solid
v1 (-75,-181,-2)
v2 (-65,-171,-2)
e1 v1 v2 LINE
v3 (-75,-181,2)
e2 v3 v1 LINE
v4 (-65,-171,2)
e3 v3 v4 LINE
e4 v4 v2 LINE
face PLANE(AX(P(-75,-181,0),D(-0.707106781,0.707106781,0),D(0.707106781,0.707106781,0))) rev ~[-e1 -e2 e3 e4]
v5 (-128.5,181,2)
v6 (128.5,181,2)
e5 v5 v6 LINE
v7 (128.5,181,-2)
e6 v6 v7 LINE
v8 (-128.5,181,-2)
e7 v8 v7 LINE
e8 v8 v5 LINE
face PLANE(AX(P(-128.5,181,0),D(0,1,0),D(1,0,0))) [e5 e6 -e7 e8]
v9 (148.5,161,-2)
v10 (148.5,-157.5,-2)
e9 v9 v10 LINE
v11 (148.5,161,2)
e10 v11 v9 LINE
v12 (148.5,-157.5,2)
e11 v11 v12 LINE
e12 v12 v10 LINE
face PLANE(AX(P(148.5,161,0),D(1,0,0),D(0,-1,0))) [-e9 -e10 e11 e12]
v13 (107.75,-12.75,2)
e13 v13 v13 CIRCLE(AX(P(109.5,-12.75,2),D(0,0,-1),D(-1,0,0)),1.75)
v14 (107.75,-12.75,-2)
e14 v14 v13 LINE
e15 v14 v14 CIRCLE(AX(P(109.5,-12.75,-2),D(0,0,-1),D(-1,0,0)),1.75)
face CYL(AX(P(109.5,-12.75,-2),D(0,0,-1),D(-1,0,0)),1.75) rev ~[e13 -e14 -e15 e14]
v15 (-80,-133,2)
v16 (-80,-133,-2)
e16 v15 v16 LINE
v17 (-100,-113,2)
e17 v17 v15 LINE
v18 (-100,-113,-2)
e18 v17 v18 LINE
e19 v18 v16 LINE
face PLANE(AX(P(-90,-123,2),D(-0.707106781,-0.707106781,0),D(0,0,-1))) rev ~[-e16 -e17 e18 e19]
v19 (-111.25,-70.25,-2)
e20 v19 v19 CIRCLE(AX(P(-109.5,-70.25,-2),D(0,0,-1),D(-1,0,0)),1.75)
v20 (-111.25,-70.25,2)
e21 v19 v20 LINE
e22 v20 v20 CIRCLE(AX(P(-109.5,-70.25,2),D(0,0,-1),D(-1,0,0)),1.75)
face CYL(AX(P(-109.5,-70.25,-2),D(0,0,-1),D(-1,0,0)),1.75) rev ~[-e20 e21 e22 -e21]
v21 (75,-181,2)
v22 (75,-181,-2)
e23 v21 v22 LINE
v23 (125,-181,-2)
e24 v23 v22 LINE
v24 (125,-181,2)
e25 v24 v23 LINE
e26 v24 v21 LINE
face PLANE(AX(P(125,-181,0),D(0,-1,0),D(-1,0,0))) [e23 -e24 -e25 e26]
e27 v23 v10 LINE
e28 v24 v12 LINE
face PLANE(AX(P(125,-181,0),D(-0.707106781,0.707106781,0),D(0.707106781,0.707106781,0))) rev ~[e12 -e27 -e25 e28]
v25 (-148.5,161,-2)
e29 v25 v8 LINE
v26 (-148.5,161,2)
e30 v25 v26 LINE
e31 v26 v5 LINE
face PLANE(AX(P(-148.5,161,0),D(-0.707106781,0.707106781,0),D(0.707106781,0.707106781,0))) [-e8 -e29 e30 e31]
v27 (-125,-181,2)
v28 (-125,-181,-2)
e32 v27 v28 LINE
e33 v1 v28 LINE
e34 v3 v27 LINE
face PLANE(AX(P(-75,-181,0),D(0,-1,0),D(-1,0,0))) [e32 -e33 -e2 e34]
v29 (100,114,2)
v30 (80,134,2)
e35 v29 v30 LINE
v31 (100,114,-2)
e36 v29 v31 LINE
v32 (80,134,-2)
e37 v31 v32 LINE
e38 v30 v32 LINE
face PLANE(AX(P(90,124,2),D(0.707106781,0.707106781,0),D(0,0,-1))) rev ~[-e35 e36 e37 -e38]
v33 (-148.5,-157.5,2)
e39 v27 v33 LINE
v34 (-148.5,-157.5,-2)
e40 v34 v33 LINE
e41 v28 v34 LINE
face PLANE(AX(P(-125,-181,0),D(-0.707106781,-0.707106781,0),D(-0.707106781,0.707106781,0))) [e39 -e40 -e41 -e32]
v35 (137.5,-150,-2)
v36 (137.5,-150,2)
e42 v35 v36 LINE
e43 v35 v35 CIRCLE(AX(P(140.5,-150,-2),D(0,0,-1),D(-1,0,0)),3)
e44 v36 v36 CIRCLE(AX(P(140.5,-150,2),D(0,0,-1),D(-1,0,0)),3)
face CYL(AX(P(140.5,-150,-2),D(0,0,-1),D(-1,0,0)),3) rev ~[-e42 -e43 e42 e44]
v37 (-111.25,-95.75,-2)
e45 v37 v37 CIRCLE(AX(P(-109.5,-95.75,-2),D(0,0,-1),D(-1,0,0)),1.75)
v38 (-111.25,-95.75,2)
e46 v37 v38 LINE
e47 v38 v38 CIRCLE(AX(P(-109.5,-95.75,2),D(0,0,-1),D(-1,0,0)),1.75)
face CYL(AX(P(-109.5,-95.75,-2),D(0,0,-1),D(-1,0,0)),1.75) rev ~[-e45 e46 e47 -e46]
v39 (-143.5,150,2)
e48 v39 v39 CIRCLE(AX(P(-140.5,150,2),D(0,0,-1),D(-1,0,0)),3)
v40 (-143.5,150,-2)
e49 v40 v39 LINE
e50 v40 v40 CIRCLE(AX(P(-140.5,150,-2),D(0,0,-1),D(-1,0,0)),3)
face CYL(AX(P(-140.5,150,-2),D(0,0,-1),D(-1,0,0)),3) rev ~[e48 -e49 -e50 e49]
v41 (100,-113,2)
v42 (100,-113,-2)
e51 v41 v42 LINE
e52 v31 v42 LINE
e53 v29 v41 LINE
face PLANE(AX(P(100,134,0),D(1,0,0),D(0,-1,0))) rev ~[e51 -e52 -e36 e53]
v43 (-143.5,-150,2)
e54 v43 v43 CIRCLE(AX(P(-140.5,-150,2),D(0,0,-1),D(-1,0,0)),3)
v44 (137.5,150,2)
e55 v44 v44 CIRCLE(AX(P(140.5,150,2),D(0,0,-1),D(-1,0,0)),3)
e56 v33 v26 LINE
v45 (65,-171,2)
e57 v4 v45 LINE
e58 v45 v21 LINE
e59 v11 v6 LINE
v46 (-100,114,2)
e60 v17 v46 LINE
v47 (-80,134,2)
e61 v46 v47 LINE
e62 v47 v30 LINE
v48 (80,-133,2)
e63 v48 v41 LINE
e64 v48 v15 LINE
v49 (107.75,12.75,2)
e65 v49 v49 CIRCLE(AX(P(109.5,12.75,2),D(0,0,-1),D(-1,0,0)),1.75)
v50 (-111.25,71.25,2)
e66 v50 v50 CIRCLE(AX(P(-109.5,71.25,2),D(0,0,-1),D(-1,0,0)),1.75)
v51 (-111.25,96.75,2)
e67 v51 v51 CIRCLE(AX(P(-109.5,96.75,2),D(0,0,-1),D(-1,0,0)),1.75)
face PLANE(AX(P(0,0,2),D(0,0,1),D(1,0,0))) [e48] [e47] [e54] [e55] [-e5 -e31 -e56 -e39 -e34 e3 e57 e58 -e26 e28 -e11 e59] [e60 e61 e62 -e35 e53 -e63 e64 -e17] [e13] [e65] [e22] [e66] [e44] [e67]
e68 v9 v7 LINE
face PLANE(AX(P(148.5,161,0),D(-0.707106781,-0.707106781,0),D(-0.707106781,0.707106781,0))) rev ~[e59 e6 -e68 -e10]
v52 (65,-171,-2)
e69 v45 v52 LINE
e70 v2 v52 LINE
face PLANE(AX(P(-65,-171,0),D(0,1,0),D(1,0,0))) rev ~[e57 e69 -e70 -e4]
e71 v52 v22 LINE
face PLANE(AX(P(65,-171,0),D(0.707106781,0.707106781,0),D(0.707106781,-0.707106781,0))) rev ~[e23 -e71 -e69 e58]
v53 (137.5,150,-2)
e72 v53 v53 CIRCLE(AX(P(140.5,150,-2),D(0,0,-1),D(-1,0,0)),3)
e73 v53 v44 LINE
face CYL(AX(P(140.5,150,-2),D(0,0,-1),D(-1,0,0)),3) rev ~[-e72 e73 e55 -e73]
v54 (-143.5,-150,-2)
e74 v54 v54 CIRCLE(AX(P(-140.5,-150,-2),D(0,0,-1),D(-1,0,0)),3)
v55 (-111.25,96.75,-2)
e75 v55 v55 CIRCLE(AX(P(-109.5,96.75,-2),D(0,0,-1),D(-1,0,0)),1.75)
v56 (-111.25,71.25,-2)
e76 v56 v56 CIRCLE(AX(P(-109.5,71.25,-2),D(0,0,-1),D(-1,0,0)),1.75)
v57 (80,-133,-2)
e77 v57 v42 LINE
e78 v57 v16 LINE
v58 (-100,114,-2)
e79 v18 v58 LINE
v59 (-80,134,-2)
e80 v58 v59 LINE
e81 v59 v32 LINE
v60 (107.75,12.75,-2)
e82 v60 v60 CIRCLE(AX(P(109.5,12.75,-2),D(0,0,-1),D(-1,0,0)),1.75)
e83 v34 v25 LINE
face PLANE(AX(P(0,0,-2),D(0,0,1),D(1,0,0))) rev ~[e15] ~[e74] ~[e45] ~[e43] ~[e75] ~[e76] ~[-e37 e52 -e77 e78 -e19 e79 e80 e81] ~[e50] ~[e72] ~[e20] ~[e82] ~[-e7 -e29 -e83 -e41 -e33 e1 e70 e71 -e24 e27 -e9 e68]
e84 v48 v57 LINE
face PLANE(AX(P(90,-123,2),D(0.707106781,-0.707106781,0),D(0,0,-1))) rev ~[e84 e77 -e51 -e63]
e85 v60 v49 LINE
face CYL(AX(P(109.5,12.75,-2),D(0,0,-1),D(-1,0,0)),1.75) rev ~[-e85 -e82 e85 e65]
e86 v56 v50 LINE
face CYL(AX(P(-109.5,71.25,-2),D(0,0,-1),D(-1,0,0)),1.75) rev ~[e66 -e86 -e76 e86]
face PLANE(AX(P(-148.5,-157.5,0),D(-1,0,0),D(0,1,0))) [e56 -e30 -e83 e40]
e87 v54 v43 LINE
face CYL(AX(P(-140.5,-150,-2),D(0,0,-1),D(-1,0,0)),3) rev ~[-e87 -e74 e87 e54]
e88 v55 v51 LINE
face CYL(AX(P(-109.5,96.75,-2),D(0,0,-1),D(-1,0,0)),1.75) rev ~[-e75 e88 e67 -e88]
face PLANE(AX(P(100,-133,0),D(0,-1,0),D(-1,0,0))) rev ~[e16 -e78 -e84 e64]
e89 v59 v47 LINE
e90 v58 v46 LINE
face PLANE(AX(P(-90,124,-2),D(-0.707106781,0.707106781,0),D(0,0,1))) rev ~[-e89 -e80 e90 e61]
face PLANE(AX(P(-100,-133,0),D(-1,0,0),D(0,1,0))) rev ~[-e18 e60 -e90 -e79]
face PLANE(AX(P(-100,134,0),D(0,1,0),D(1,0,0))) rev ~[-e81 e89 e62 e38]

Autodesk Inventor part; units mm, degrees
ref_plane "YZ Plane" through (0, 0, 0) normal (1, 0, 0) x (0, 1, 0)
ref_plane "XZ Plane" through (0, 0, 0) normal (0, 1, 0) x (-1, 0, 0)
ref_plane "XY Plane" through (0, 0, 0) normal (0, 0, 1) x (1, 0, 0)
sketch "Hinges" plane through (0, 0, 0) normal (0, 0, 1) x (1, 0, 0)
  circle A0 centre (-464.8647, 95.9101) radius 1.75
  circle A1 centre (-464.8647, 121.4101) radius 1.75
  line L0 (-471.3647, 88.6601) -> (-455.3647, 88.6601)
  line L1 (-455.3647, 88.6601) -> (-455.3647, 128.6601)
  line L2 (-455.3647, 128.6601) -> (-471.3647, 128.6601)
  line L3 (-471.3647, 128.6601) -> (-471.3647, 88.6601)
  circle A2 centre (-439.8647, 121.4101) radius 1.75
  circle A3 centre (-439.8647, 95.9101) radius 1.75
  line L4 (-433.3647, 128.6601) -> (-449.3647, 128.6601)
  line L5 (-449.3647, 128.6601) -> (-449.3647, 88.6601)
  line L6 (-449.3647, 88.6601) -> (-433.3647, 88.6601)
  line L7 (-433.3647, 88.6601) -> (-433.3647, 128.6601)
  point P0 (-452.3647, 108.6601)
  dimension "d30" = 3.5
  dimension "d31" = 25.5
  dimension "d32" = 6.5
  dimension "d33" = 40
  dimension "d34" = 7.25
  dimension "d35" = 16
  dimension "d36" = 3.5
  dimension "d37" = 25.5
  dimension "d38" = 6.5
  dimension "d39" = 40
  dimension "d40" = 7.25
  dimension "d41" = 16
  dimension "d42" = 38
sketch "Sketch1" plane through (0, 0, 0) normal (0, 0, 1) x (1, 0, 0)
  line L0 (-148.5, 181) -> (148.5, 181)
  line L1 (148.5, 181) -> (148.5, -181)
  line L2 (148.5, -181) -> (-148.5, -181)
  line L3 (-148.5, -181) -> (-148.5, 181)
  line L4 (-75, -181) -> (-65, -171)
  line L5 (-75, -181) -> (-60.8579, -181) construction
  line L6 (-65, -171) -> (65, -171)
  line L7 (65, -171) -> (75, -181)
  line L8 (-125, -181) -> (-148.5, -157.5)
  line L9 (-125, -181) -> (-91.766, -181) construction
  line L10 (125, -181) -> (148.5, -157.5)
  line L11 (125, -181) -> (158.234, -181) construction
  line L12 (-148.5, 161) -> (-128.5, 181)
  line L13 (-148.5, 161) -> (-120.2157, 161) construction
  line L14 (148.5, 161) -> (128.5, 181)
  line L15 (-100, 134) -> (100, 134)
  line L16 (100, 134) -> (100, -133)
  line L17 (100, -133) -> (-100, -133)
  line L18 (-100, -133) -> (-100, 134)
  point P0 (0, 0)
  point P1 (0, 181)
  point P2 (-148.5, 0)
  point P3 (0, -171)
  point P4 (0, 134)
  dimension "d0" = 297
  dimension "d1" = 362
  dimension "d2" = 45
  dimension "d3" = 10
  dimension "d4" = 150
  dimension "d5" = 135
  dimension "d6" = 50
  dimension "d7" = 45
  dimension "d8" = 50
  dimension "d9" = 45
  dimension "d10" = 20
  dimension "d11" = 20
  dimension "d12" = 135
  dimension "d13" = 47
  dimension "d14" = 200
  dimension "d15" = 267
extrude "Extrusion1" add sketch "Sketch1" along normal mid plane 4 contours L0 L14 L1 L10 L2 L7 L6 L4 L8 L3 L12
chamfer "Chamfer1" distance 20 angle 45 4 edges at (-100, 134, 0) (100, 134, 0) (-100, -133, 0) (100, -133, 0)
sketch "Sketch3" plane through (0, 0, -2) normal (0, 0, -1) x (-1, 0, 0)
  circle A0 centre (-140.5, 150) radius 3
  circle A1 centre (-140.5, -150) radius 3
  circle A2 centre (140.5, -150) radius 3
  circle A3 centre (140.5, 150) radius 3
  line L0 (-148.5, 161) -> (-148.5, -157.5) projected
  line L1 (148.5, -157.5) -> (148.5, 161) projected
  point P0 (0, 0)
  dimension "d25" = 6
  dimension "d26" = 300
  dimension "d27" = 150
  dimension "d47" = 8
  dimension "d48" = 8
extrude "Extrusion3" cut sketch "Sketch3" against normal blind 37.5
sketch "Sketch4" plane through (0, 0, -2) normal (0, 0, -1) x (-1, 0, 0)
  line L0 (100, 114) -> (100, -113) projected
  line L1 (-100, -113) -> (-100, 114) projected
  circle A0 centre (84.5, 71.25) radius 1.75
  circle A1 centre (84.5, 96.75) radius 1.75
  line L2 (78, 64) -> (94, 64)
  line L3 (94, 64) -> (94, 104)
  line L4 (94, 104) -> (78, 104)
  line L5 (78, 104) -> (78, 64)
  circle A2 centre (109.5, 96.75) radius 1.75
  circle A3 centre (109.5, 71.25) radius 1.75
  line L6 (116, 104) -> (100, 104)
  line L7 (100, 104) -> (100, 64)
  line L8 (100, 64) -> (116, 64)
  line L9 (116, 64) -> (116, 104)
  circle A4 centre (84.5, -95.75) radius 1.75
  circle A5 centre (84.5, -70.25) radius 1.75
  line L10 (78, -103) -> (94, -103)
  line L11 (94, -103) -> (94, -63)
  line L12 (94, -63) -> (78, -63)
  line L13 (78, -63) -> (78, -103)
  circle A6 centre (109.5, -70.25) radius 1.75
  circle A7 centre (109.5, -95.75) radius 1.75
  line L14 (116, -63) -> (100, -63)
  line L15 (100, -63) -> (100, -103)
  line L16 (100, -103) -> (116, -103)
  line L17 (116, -103) -> (116, -63)
  circle A8 centre (-109.5, -12.75) radius 1.75
  circle A9 centre (-109.5, 12.75) radius 1.75
  line L18 (-116, -20) -> (-100, -20)
  line L19 (-100, -20) -> (-100, 20)
  line L20 (-100, 20) -> (-116, 20)
  line L21 (-116, 20) -> (-116, -20)
  circle A10 centre (-84.5, 12.75) radius 1.75
  circle A11 centre (-84.5, -12.75) radius 1.75
  line L22 (-78, 20) -> (-94, 20)
  line L23 (-94, 20) -> (-94, -20)
  line L24 (-94, -20) -> (-78, -20)
  line L25 (-78, -20) -> (-78, 20)
  point P0 (0, 0)
  point P1 (-100, 0)
  dimension "d43" = 10
  dimension "d44" = 10
extrude "Extrusion4" cut sketch "Sketch4" against normal blind 10 contours A2 | A3 | A6 | A7 | A8 | A9
equation "\"d27\" = 0.5 * d26"
equation "\"d34\" = -0.5 * d31 + 0.5 * d33"
equation "\"d40\" = -0.5 * d37 + 0.5 * d39"
equation "\"d8\" = d6"
equation "\"d48\" = d47"
properties part number "Sides Covers" material "Wood (Birch)"
